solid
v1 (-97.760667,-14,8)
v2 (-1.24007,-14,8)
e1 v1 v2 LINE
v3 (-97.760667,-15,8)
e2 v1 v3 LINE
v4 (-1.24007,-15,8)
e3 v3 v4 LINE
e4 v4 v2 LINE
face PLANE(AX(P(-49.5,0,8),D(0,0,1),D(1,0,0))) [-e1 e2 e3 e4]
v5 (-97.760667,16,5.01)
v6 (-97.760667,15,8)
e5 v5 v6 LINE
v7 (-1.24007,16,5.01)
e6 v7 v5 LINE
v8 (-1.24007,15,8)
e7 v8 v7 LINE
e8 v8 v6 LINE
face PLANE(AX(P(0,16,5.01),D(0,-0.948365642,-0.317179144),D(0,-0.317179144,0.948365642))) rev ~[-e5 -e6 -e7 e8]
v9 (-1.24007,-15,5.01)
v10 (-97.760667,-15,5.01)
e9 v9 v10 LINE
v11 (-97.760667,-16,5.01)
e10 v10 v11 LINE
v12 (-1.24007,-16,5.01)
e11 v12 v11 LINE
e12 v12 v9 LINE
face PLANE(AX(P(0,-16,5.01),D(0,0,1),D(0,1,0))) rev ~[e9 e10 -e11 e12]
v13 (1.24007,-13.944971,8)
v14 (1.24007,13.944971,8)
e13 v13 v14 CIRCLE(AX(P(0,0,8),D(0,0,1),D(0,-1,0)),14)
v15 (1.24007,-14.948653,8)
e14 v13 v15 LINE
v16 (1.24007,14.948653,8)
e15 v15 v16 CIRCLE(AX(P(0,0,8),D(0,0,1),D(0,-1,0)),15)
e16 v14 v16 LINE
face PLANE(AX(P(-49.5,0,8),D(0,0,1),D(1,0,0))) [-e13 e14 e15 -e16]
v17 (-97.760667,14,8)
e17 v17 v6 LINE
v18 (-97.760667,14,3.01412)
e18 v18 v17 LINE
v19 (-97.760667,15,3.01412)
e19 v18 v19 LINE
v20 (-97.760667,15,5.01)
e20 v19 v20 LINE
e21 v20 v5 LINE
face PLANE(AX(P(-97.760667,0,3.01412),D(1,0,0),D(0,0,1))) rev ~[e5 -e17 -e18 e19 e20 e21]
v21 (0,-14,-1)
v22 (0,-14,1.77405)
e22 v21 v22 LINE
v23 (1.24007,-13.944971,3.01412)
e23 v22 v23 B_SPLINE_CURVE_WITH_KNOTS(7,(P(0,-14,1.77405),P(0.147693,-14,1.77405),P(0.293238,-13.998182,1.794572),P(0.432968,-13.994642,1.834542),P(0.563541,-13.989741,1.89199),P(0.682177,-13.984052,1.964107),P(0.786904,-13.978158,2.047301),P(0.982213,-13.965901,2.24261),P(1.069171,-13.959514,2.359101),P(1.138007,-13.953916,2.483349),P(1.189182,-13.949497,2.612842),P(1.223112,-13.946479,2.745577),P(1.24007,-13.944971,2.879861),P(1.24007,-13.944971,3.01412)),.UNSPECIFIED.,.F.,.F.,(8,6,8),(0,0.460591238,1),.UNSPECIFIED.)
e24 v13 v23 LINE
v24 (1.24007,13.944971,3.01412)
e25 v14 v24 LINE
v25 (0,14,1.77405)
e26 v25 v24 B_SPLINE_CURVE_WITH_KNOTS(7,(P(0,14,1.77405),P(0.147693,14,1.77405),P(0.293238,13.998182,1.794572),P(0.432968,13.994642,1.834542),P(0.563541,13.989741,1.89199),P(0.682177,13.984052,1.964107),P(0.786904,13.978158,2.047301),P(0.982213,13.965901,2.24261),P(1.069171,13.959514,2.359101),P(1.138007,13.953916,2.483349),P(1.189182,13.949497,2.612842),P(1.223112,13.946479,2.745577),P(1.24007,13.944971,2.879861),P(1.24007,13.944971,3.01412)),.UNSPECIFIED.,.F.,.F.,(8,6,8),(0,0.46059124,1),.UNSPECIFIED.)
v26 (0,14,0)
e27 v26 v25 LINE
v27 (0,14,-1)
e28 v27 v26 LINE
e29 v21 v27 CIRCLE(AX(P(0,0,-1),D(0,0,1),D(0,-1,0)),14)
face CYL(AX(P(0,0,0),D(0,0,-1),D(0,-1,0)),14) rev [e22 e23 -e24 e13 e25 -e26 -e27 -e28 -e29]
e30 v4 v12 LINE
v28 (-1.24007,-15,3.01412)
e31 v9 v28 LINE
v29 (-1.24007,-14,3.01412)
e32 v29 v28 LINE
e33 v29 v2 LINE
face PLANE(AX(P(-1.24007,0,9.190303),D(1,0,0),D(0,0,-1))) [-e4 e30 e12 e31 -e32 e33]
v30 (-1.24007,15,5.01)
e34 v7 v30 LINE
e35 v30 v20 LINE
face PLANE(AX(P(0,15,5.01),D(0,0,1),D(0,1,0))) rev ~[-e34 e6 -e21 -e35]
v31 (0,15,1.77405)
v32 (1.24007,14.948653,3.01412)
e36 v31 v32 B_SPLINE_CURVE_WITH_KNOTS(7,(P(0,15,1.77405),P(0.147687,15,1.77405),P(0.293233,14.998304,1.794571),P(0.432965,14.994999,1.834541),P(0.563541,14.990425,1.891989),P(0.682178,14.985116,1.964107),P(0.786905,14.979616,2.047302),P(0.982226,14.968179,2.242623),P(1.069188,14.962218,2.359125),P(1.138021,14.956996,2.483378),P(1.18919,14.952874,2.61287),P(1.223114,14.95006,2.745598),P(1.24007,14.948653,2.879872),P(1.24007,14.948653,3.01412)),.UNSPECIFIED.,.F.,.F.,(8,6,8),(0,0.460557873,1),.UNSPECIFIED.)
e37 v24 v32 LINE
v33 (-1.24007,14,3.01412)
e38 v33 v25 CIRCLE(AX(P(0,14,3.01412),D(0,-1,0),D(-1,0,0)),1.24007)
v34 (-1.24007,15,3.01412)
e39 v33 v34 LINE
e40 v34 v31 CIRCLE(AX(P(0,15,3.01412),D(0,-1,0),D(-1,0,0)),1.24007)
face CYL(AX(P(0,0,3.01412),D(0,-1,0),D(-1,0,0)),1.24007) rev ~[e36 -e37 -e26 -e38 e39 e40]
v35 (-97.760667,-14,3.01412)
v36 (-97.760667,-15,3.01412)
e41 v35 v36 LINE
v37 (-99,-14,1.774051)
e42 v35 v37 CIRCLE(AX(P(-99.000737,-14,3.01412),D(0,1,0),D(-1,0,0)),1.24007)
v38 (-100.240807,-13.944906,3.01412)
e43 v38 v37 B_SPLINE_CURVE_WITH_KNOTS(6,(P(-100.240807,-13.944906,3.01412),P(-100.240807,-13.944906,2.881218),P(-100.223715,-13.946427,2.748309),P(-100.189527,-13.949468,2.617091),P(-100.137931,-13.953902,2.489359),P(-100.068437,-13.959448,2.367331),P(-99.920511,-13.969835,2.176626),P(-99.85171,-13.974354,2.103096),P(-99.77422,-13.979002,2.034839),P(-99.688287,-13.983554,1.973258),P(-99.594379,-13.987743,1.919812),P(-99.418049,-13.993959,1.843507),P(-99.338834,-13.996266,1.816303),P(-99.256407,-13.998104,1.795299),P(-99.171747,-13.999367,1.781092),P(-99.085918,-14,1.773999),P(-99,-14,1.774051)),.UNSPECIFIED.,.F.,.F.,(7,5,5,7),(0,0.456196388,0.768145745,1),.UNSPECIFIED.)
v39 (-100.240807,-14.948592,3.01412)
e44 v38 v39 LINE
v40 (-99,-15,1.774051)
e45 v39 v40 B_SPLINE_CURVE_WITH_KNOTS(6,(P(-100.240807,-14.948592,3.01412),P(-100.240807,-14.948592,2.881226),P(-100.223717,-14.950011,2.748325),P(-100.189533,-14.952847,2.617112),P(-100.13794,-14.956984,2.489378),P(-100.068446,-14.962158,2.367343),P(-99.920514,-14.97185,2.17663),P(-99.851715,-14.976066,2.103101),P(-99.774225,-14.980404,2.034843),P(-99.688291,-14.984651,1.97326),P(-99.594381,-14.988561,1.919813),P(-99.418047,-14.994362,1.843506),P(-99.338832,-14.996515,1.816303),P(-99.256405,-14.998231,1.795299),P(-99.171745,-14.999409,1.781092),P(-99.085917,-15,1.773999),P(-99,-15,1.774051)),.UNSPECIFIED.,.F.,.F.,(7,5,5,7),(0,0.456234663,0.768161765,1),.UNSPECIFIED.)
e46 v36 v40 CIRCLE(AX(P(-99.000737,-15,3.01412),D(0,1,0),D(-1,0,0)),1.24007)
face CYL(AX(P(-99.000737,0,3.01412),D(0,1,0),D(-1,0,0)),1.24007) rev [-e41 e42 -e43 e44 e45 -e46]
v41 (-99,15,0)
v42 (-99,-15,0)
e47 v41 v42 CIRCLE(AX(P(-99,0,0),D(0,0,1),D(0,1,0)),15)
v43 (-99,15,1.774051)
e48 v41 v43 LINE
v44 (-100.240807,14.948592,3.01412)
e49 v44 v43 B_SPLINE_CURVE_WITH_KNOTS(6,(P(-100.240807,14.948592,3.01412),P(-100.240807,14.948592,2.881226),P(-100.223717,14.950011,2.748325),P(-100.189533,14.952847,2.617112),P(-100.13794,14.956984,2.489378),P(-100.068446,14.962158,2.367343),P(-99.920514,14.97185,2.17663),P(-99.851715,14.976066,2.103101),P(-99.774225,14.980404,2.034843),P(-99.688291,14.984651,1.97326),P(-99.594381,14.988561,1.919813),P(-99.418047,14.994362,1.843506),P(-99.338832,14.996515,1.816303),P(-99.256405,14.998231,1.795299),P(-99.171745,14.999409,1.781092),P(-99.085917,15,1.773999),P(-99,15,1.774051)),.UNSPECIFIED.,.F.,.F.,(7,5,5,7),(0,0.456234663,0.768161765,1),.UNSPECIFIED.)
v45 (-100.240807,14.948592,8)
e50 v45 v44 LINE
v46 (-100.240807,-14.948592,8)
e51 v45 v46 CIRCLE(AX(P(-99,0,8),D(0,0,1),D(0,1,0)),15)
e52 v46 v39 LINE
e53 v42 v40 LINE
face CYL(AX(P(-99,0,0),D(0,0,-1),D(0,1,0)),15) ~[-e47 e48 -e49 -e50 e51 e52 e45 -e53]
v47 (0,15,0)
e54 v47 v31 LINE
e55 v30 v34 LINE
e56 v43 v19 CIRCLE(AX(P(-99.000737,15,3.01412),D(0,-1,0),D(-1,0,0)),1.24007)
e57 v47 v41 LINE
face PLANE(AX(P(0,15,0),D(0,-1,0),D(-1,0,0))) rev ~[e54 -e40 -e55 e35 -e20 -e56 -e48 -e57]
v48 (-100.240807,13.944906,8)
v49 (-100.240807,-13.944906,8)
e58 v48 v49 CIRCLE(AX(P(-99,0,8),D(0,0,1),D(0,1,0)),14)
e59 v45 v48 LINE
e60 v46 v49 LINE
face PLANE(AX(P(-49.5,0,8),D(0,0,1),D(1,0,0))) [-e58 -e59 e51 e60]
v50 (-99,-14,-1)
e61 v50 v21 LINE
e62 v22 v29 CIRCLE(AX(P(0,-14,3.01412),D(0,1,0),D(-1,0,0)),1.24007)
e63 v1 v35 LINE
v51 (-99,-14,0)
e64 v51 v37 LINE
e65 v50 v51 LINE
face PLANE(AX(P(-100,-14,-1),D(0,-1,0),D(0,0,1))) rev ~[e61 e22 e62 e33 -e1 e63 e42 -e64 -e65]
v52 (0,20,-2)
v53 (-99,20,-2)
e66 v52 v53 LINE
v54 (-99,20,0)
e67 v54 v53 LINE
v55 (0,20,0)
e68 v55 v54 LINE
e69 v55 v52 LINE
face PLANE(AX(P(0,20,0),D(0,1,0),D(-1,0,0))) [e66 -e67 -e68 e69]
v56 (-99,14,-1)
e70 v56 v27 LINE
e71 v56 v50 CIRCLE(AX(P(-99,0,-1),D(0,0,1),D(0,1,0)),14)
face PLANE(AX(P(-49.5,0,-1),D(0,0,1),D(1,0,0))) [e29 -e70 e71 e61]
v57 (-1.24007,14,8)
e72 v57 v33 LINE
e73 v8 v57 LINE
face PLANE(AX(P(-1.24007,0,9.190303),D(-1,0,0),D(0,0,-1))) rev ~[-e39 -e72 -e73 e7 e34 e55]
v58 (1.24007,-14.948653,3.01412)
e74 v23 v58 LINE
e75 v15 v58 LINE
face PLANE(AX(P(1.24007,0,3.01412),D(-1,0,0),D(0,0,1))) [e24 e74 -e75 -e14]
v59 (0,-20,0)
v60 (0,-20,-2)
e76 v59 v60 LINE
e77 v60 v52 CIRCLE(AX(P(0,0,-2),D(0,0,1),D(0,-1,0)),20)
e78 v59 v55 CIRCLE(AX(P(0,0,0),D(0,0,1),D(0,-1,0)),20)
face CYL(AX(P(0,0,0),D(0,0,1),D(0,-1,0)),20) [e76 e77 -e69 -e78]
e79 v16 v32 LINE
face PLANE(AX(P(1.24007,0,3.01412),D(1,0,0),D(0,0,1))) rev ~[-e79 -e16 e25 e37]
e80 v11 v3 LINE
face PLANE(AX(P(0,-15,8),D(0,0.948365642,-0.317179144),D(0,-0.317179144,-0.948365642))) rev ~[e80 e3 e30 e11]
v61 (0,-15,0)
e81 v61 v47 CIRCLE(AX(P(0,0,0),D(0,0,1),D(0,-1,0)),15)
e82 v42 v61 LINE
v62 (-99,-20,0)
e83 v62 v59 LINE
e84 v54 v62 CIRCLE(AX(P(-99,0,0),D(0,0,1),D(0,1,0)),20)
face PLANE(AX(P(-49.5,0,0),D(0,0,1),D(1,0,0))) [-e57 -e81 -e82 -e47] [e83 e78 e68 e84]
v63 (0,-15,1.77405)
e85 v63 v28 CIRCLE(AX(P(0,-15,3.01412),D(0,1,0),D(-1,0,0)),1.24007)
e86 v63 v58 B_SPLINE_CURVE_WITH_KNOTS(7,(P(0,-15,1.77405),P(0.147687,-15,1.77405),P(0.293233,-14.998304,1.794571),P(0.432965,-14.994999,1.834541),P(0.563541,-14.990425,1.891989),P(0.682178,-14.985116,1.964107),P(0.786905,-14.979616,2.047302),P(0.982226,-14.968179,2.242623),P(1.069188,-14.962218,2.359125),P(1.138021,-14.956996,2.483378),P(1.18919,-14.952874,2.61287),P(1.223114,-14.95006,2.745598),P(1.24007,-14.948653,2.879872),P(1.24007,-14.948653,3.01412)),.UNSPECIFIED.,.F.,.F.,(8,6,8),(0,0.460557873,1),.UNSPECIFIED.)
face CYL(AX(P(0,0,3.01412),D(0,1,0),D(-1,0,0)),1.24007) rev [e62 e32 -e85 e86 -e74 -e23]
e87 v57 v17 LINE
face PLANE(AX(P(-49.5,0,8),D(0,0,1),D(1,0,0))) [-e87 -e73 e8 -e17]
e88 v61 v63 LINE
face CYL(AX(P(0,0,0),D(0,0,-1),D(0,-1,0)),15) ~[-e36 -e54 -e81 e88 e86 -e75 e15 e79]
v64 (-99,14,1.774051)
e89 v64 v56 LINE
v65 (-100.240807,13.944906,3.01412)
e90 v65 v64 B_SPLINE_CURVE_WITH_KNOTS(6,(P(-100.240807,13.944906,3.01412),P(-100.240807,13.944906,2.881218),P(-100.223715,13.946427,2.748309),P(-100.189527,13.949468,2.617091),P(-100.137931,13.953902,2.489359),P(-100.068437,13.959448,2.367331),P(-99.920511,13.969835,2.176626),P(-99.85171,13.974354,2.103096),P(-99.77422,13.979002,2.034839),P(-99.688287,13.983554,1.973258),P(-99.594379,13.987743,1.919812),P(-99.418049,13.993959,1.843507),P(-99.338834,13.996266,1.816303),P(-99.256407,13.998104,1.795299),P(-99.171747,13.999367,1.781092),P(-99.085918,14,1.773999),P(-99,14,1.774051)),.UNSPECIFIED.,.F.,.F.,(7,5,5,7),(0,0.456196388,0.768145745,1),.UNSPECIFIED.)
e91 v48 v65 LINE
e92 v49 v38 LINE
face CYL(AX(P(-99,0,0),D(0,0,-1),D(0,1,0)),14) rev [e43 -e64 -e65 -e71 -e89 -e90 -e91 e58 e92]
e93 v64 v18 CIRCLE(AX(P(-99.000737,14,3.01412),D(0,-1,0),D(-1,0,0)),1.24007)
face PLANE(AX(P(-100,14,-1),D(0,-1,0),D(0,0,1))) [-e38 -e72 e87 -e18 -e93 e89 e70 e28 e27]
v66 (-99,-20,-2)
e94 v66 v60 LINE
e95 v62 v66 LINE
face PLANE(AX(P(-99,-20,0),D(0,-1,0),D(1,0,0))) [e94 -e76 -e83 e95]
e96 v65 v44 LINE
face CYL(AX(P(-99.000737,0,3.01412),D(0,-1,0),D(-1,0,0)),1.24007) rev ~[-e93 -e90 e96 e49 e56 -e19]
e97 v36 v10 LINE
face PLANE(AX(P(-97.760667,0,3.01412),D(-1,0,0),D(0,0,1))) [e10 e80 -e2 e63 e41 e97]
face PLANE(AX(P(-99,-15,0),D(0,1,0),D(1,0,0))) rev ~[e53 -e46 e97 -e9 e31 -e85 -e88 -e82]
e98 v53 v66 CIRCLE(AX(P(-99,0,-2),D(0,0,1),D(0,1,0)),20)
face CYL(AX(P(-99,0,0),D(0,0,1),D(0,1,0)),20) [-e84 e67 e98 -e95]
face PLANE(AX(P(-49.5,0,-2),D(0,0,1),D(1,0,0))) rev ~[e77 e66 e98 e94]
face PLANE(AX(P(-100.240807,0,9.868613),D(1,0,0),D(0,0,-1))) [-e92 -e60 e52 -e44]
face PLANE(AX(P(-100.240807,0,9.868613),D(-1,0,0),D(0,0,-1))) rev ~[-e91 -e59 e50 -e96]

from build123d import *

# Parameters (mm, degrees)
F1_DEPTH      = 2
F2_DEPTH      = 8
F3_T          = 1
F3_T3_DEPTH   = 101
F3_T6_ANGLE   = 180.000000001
F3_T8_ANGLE   = 180.000000001
F7_DEPTH      = 25
F7_DEPTH_BACK = 25


# Not quite as in the source:
# - a shell that OpenCascade refuses in one call is made with other operations: the cavity is built on its own and cut out


with BuildPart() as f1:
    # F0 (on Top) → F1 (new body)
    with BuildSketch(Plane.XY):
        with BuildLine():
            Line((0, 19.999999553), (-99, 19.999999553))
            ThreePointArc((-99, 19.999999553), (-118.999999553, 0), (-99, -19.999999553))
            Line((-99, -19.999999553), (0, -19.999999553))
            ThreePointArc((0, -19.999999553), (19.999999553, 0), (0, 19.999999553))
        make_face()
        with BuildLine():
            ThreePointArc((0, 15), (15, 0), (0, -15))
            Line((0, -15), (-99, -15))
            ThreePointArc((-99, -15), (-114, 0), (-99, 15))
            Line((-99, 15), (0, 15))
        make_face(mode=Mode.SUBTRACT)
        with BuildLine():
            Line((-99, -15), (0, -15))
            ThreePointArc((0, -15), (15, 0), (0, 15))
            Line((0, 15), (-99, 15))
            ThreePointArc((-99, 15), (-114, 0), (-99, -15))
        make_face()
    extrude(amount=-F1_DEPTH)

    # F0 (on Top) → F2 (join)
    with BuildSketch(Plane.XY):
        with BuildLine():
            Line((-99, -15), (0, -15))
            ThreePointArc((0, -15), (15, 0), (0, 15))
            Line((0, 15), (-99, 15))
            ThreePointArc((-99, 15), (-114, 0), (-99, -15))
        make_face()
    extrude(amount=F2_DEPTH)

    # F3: shell of thickness 1, made by hand


with BuildPart() as f3_core1:
    # F3_t2: copy of F1
    add(f1.part)

    # the walls: a layer under each face that stays
    f3_faces = [f3_core1.faces().sort_by_distance(p)[0] for p in [
        (-49.5, -19.999999553, -1),
        (-118.999999553, 0, -1),
        (19.999999553, 0, -1),
        (-109.0714281883, -17.1428567597, 0),
        (-49.5, 0, -2),
        (-49.5, 19.999999553, -1),
        (-49.5, -15, 4),
        (15, 0, 4),
        (-49.5, 15, 4),
        (-114, 0, 4),
    ]]
    thicken(f3_faces, amount=-F3_T, mode=Mode.SUBTRACT)

    # F3_s4 → F3_t3 (cut)
    with BuildSketch(Plane.YZ.offset(-100)):
        Polygon((-15.01, 0.01), (-15, -1), (-14, -1), (-14, 0), align=None)
        Polygon((15.01, 0.01), (15, -1), (14, -1), (14, 0), align=None)
    extrude(amount=F3_T3_DEPTH, mode=Mode.SUBTRACT)

    # F3_s5 → F3_t6 (revolve, cut)
    with BuildSketch(Plane.YZ):
        Polygon((-15.01, 0.01), (-15, -1), (-14, -1), (-14, 0), align=None)
    revolve(axis=Axis((0, 0, 0), (0, 0, 1)), revolution_arc=F3_T6_ANGLE, mode=Mode.SUBTRACT)

    # F3_s7 → F3_t8 (revolve, cut)
    with BuildSketch(Plane.YZ.offset(-99)):
        Polygon((15.01, 0.01), (15, -1), (14, -1), (14, 0), align=None)
    revolve(axis=Axis((-99, 0, 0), (0, 0, 1)), revolution_arc=F3_T8_ANGLE, mode=Mode.SUBTRACT)


with BuildPart() as f1_1:
    add(f1.part)

    # what is left inside the walls is the cavity
    f3_cavity = [f3_core1.part.solids().sort_by_distance(p)[0] for p in [
        (-49.5, -4.666667, 7.99),
    ]]
    add(f3_cavity, mode=Mode.SUBTRACT)

    # F5: sweep along a path in F5_path
    with BuildLine(Plane(origin=(0, 15, 8), x_dir=(0, -1, 0), z_dir=(0, 0, -1))) as f5_path:
        Line((0, 0), (0, 99))
    # F4 (on Right) → F5 (sweep)
    with BuildSketch(Plane.YZ):
        Polygon((16, 5.01), (15, 8), (15, 5.01), align=None)
        Polygon((-15, 5.01), (-15, 8), (-16, 5.01), align=None)
    sweep(path=f5_path.line)

    # F6 (on Front) → F7 (cut, two sides)
    with BuildSketch(Plane.XZ) as f7_sk:
        with BuildLine():
            ThreePointArc((-100.2408070591, 3.0141202733), (-99.000737071, 1.7740502852), (-97.760667083, 3.0141202733))
            Line((-97.760667083, 3.0141202733), (-97.760667083, 9.1903032735))
            Line((-97.760667083, 9.1903032735), (-100.2408070591, 9.8686125129))
            Line((-100.2408070591, 9.8686125129), (-100.2408070591, 3.0141202733))
        make_face()
        with BuildLine():
            Line((-1.2400699881, 9.1903032735), (-1.2400699881, 3.0141202733))
            ThreePointArc((-1.2400699881, 3.0141202733), (0, 1.7740502852), (1.2400699881, 3.0141202733))
            Line((1.2400699881, 3.0141202733), (1.2400699881, 9.8686125129))
            Line((1.2400699881, 9.8686125129), (-1.2400699881, 9.1903032735))
        make_face()
    extrude(amount=-F7_DEPTH, mode=Mode.SUBTRACT)
    extrude(f7_sk.sketch, amount=F7_DEPTH_BACK, mode=Mode.SUBTRACT)


solid = f1_1.part
